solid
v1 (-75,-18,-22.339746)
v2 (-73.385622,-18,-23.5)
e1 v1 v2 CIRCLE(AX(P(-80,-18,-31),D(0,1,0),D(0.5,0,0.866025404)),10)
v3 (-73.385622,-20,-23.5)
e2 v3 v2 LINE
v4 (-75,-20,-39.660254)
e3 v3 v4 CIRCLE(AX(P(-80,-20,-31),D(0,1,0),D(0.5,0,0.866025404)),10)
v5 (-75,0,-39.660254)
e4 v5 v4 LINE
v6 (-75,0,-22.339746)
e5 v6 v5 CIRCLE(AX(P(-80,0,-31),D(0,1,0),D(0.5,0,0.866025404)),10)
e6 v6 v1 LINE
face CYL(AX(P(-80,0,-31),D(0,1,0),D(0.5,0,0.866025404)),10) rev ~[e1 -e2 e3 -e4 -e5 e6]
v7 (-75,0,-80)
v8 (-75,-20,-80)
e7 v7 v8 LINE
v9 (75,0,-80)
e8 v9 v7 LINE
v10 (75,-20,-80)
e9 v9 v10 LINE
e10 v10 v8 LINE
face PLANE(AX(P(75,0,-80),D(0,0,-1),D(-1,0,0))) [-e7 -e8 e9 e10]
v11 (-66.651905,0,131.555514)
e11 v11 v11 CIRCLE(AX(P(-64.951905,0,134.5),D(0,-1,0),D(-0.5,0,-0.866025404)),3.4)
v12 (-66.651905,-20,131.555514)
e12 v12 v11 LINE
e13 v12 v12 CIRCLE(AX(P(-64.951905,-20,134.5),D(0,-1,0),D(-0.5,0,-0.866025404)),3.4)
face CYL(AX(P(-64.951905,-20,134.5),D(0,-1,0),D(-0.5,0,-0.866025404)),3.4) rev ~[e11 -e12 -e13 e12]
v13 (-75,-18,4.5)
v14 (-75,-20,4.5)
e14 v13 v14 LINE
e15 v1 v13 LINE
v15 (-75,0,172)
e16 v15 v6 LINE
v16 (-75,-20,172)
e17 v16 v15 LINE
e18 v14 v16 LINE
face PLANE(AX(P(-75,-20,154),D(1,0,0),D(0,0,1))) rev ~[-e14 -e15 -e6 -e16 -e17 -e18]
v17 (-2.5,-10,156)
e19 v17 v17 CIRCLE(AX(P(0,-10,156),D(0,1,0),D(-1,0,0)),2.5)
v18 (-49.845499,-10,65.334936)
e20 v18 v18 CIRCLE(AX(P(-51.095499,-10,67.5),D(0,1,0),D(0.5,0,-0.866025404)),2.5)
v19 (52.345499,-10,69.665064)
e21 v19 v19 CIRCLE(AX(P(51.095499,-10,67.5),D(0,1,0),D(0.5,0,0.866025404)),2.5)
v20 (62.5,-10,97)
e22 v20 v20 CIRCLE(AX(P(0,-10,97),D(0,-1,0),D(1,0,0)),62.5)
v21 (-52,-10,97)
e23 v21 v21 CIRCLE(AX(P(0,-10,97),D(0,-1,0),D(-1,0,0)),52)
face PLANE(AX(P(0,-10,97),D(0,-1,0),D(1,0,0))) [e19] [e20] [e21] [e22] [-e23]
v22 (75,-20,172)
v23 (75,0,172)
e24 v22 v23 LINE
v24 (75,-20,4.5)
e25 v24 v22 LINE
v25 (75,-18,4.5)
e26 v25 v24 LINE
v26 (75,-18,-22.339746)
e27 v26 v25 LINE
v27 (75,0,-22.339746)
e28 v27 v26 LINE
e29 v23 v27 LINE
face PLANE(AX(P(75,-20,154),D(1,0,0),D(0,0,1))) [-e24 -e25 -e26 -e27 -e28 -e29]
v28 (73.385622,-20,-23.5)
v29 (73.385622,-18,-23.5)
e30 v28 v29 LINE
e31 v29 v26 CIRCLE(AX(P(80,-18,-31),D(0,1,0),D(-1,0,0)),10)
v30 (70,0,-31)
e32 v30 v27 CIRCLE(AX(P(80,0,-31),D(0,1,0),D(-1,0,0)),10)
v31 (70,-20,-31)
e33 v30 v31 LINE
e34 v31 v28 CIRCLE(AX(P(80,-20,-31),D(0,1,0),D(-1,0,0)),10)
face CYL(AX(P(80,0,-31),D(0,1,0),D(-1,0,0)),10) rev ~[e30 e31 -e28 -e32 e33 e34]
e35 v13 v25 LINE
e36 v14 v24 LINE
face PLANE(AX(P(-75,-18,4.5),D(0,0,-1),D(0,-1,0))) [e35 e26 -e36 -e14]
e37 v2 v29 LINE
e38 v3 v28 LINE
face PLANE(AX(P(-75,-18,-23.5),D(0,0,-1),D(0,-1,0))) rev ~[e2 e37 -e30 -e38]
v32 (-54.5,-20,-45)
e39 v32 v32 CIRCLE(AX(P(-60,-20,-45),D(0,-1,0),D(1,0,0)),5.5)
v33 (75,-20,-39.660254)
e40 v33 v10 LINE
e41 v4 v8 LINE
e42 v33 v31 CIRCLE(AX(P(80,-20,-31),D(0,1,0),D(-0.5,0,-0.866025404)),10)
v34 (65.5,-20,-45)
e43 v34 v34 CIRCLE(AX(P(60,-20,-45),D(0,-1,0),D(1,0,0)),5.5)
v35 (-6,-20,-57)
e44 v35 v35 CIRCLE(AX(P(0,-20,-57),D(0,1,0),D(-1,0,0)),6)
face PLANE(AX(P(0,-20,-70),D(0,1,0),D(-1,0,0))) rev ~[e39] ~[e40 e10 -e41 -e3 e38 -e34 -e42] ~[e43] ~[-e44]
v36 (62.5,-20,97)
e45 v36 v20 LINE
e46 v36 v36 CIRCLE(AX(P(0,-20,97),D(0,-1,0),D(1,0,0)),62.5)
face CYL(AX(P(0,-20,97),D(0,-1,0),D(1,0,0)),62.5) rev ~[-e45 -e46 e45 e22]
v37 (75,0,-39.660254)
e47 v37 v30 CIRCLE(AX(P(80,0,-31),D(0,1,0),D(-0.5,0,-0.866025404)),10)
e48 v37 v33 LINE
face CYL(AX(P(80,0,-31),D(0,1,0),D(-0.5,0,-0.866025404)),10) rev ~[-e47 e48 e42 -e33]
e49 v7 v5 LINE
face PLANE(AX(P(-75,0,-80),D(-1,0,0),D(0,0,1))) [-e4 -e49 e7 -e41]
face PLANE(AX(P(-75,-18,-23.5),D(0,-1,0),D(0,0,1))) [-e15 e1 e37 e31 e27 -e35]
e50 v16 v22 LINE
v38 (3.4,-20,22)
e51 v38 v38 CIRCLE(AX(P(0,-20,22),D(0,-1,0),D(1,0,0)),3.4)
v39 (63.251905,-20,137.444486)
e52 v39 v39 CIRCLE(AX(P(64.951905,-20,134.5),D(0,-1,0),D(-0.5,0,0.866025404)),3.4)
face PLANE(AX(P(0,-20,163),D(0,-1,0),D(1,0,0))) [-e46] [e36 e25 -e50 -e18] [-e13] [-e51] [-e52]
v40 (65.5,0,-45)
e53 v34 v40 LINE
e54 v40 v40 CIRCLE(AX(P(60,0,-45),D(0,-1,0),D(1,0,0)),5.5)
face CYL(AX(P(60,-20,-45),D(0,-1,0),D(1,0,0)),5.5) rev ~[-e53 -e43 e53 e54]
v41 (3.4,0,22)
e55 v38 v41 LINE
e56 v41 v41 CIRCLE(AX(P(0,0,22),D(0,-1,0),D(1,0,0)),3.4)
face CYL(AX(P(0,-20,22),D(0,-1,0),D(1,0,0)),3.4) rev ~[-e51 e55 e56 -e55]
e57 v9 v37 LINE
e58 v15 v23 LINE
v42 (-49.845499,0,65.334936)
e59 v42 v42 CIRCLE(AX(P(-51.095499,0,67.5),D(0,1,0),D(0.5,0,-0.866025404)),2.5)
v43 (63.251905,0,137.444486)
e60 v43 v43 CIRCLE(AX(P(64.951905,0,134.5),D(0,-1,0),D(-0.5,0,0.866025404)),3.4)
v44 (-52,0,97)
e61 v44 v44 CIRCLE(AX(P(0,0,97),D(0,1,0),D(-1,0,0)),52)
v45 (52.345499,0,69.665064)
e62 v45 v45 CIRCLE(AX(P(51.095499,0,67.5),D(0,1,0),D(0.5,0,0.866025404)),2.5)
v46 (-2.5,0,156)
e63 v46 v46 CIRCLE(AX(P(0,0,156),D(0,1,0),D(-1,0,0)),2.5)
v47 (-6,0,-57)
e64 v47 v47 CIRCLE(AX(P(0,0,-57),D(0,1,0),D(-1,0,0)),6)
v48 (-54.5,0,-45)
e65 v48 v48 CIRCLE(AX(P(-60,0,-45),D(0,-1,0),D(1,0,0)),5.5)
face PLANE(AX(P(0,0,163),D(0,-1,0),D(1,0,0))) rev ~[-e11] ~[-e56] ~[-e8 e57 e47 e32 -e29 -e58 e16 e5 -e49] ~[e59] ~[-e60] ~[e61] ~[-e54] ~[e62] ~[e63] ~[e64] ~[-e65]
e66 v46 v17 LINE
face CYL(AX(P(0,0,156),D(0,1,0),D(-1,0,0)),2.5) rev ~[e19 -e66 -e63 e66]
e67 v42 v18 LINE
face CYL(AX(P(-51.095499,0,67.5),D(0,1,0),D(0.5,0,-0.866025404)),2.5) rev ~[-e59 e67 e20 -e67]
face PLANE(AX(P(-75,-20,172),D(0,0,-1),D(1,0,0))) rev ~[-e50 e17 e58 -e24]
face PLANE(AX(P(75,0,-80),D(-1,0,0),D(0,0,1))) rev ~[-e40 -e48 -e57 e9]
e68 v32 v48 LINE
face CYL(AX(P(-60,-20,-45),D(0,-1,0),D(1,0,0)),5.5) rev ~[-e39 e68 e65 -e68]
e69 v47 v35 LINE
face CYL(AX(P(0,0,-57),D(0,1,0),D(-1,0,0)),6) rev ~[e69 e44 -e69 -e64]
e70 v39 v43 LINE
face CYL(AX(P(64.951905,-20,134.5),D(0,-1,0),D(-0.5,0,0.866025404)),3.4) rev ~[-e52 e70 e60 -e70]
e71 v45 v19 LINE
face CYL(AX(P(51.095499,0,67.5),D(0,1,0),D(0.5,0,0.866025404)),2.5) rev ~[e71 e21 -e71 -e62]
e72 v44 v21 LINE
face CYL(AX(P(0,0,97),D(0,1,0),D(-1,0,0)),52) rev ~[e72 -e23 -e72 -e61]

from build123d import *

# Parameters (mm, degrees)
F0_W             = 150
F0_H             = 90
F1_DEPTH         = 20
F2_R             = 5.5
F3_DEPTH         = 20.001
F4_W             = 2
F4_H             = 28
F5_DEPTH         = 150.001
F6_W             = 150
F6_H             = 124
F6_R             = 30
F7_DEPTH         = 20
F9_DEPTH         = 20.001
F11_W            = 150
F11_H            = 20
F12_DEPTH        = 20
F13_R            = 6
F14_DEPTH        = 20.001
F15_W            = 150
F15_H            = 18
F16_DEPTH        = 20
F17_R            = 52
F17_R_2          = 30
F18_DEPTH        = 20
F20_R            = 62.5
F20_R_2          = 52
F21_DEPTH        = 10
F22_R            = 3.4
F23_DEPTH        = 20.001
F23_COPIES_COUNT = 3
F24_R            = 2.5
F25_DEPTH        = 20.001
F25_COPIES_COUNT = 3


# Not quite as in the source:
# - a pattern or mirror of a feature is missing from the dataset's text; its kind, count and spacing are read off the source's solid


with BuildPart() as f1:
    # F0 (on Front) → F1 (new body)
    with BuildSketch(Plane.XZ):
        with Locations((0, -15)):
            Rectangle(F0_W, F0_H)
    extrude(amount=F1_DEPTH)

    # F2 (on face) → F3 (cut, through all)
    with BuildSketch(Plane.XZ.offset(20)):
        with Locations((-60, -45)):
            Circle(F2_R)
        with Locations((60, -45)):
            Circle(F2_R)
    extrude(amount=-F3_DEPTH, mode=Mode.SUBTRACT)

    # F4 (on face) → F5 (cut, through all)
    with BuildSketch(Plane(origin=(-75, 0, 0), x_dir=(0, -1, 0), z_dir=(-1, 0, 0))):
        with Locations((19, -9.5)):
            Rectangle(F4_W, F4_H)
    extrude(amount=-F5_DEPTH, mode=Mode.SUBTRACT)

    # F6 (on face) → F7 (join)
    with BuildSketch(Plane(origin=(0, 0, 0), x_dir=(-1, 0, 0), z_dir=(0, 1, 0))):
        with Locations((0, 92)):
            Rectangle(F6_W, F6_H)
        with Locations((0, 97)):
            Circle(F6_R, mode=Mode.SUBTRACT)
    extrude(amount=-F7_DEPTH)

    # F8 (on face) → F9 (cut, through all)
    with BuildSketch(Plane(origin=(0, 0, 0), x_dir=(-1, 0, 0), z_dir=(0, 1, 0))):
        with BuildLine():
            ThreePointArc((-75, -39.6602540378), (-71.3397459622, -36), (-70, -31))
            ThreePointArc((-70, -31), (-71.3397459622, -26), (-75, -22.3397459622))
            Line((-75, -22.3397459622), (-75, -39.6602540378))
        make_face()
        with BuildLine():
            Line((-75, -39.6602540378), (-75, -22.3397459622))
            ThreePointArc((-75, -22.3397459622), (-90, -31), (-75, -39.6602540378))
        make_face()
        with BuildLine():
            Line((75, -39.6602540378), (75, -22.3397459622))
            ThreePointArc((75, -22.3397459622), (70, -31), (75, -39.6602540378))
        make_face()
        with BuildLine():
            ThreePointArc((90, -31), (85, -22.3397459622), (75, -22.3397459622))
            Line((75, -22.3397459622), (75, -39.6602540378))
            ThreePointArc((75, -39.6602540378), (85, -39.6602540378), (90, -31))
        make_face()
    extrude(amount=-F9_DEPTH, mode=Mode.SUBTRACT)

    # F11 (on face) → F12 (join)
    with BuildSketch(Plane(origin=(0, 0, 0), x_dir=(-1, 0, 0), z_dir=(0, 1, 0))):
        with Locations((0, -70)):
            Rectangle(F11_W, F11_H)
    extrude(amount=-F12_DEPTH)

    # F13 (on face) → F14 (cut, through all)
    with BuildSketch(Plane(origin=(0, 0, 0), x_dir=(-1, 0, 0), z_dir=(0, 1, 0))):
        with Locations((0, -57)):
            Circle(F13_R)
    extrude(amount=-F14_DEPTH, mode=Mode.SUBTRACT)

    # F15 (on face) → F16 (join)
    with BuildSketch(Plane.XZ.offset(20)):
        with Locations((0, 163)):
            Rectangle(F15_W, F15_H)
    extrude(amount=-F16_DEPTH)

    # F17 (on face) → F18 (cut)
    with BuildSketch(Plane(origin=(0, 0, 0), x_dir=(-1, 0, 0), z_dir=(0, 1, 0))):
        with Locations((0, 97)):
            Circle(F17_R)
        with Locations((0, 97)):
            Circle(F17_R_2, mode=Mode.SUBTRACT)
    extrude(amount=-F18_DEPTH, mode=Mode.SUBTRACT)

    # F20 (on face) → F21 (cut)
    with BuildSketch(Plane.XZ.offset(20)):
        with Locations((0, 97)):
            Circle(F20_R)
        with Locations((0, 97)):
            Circle(F20_R_2, mode=Mode.SUBTRACT)
    extrude(amount=-F21_DEPTH, mode=Mode.SUBTRACT)

    # F22 (on face) → F23 (cut, through all)
    with BuildSketch(Plane.XZ.offset(20)):
        with Locations((0, 22)):
            Circle(F22_R)
    f23 = extrude(amount=-F23_DEPTH, mode=Mode.SUBTRACT)

    # F23_copies: F23 ×3 about axis
    f23_copies_axis = Axis((0, 0, 97), (0, 1, 0))
    for i in range(1, F23_COPIES_COUNT):
        add(f23.rotate(f23_copies_axis, i * 360 / F23_COPIES_COUNT), mode=Mode.SUBTRACT)

    # F24 (on face) → F25 (cut, through all)
    with BuildSketch(Plane(origin=(0, 0, 0), x_dir=(-1, 0, 0), z_dir=(0, 1, 0))):
        with Locations((0, 156)):
            Circle(F24_R)
    f25 = extrude(amount=-F25_DEPTH, mode=Mode.SUBTRACT)

    # F25_copies: F25 ×3 about axis
    f25_copies_axis = Axis((0, 0, 97), (0, 1, 0))
    for i in range(1, F25_COPIES_COUNT):
        add(f25.rotate(f25_copies_axis, i * 360 / F25_COPIES_COUNT), mode=Mode.SUBTRACT)


solid = f1.part
